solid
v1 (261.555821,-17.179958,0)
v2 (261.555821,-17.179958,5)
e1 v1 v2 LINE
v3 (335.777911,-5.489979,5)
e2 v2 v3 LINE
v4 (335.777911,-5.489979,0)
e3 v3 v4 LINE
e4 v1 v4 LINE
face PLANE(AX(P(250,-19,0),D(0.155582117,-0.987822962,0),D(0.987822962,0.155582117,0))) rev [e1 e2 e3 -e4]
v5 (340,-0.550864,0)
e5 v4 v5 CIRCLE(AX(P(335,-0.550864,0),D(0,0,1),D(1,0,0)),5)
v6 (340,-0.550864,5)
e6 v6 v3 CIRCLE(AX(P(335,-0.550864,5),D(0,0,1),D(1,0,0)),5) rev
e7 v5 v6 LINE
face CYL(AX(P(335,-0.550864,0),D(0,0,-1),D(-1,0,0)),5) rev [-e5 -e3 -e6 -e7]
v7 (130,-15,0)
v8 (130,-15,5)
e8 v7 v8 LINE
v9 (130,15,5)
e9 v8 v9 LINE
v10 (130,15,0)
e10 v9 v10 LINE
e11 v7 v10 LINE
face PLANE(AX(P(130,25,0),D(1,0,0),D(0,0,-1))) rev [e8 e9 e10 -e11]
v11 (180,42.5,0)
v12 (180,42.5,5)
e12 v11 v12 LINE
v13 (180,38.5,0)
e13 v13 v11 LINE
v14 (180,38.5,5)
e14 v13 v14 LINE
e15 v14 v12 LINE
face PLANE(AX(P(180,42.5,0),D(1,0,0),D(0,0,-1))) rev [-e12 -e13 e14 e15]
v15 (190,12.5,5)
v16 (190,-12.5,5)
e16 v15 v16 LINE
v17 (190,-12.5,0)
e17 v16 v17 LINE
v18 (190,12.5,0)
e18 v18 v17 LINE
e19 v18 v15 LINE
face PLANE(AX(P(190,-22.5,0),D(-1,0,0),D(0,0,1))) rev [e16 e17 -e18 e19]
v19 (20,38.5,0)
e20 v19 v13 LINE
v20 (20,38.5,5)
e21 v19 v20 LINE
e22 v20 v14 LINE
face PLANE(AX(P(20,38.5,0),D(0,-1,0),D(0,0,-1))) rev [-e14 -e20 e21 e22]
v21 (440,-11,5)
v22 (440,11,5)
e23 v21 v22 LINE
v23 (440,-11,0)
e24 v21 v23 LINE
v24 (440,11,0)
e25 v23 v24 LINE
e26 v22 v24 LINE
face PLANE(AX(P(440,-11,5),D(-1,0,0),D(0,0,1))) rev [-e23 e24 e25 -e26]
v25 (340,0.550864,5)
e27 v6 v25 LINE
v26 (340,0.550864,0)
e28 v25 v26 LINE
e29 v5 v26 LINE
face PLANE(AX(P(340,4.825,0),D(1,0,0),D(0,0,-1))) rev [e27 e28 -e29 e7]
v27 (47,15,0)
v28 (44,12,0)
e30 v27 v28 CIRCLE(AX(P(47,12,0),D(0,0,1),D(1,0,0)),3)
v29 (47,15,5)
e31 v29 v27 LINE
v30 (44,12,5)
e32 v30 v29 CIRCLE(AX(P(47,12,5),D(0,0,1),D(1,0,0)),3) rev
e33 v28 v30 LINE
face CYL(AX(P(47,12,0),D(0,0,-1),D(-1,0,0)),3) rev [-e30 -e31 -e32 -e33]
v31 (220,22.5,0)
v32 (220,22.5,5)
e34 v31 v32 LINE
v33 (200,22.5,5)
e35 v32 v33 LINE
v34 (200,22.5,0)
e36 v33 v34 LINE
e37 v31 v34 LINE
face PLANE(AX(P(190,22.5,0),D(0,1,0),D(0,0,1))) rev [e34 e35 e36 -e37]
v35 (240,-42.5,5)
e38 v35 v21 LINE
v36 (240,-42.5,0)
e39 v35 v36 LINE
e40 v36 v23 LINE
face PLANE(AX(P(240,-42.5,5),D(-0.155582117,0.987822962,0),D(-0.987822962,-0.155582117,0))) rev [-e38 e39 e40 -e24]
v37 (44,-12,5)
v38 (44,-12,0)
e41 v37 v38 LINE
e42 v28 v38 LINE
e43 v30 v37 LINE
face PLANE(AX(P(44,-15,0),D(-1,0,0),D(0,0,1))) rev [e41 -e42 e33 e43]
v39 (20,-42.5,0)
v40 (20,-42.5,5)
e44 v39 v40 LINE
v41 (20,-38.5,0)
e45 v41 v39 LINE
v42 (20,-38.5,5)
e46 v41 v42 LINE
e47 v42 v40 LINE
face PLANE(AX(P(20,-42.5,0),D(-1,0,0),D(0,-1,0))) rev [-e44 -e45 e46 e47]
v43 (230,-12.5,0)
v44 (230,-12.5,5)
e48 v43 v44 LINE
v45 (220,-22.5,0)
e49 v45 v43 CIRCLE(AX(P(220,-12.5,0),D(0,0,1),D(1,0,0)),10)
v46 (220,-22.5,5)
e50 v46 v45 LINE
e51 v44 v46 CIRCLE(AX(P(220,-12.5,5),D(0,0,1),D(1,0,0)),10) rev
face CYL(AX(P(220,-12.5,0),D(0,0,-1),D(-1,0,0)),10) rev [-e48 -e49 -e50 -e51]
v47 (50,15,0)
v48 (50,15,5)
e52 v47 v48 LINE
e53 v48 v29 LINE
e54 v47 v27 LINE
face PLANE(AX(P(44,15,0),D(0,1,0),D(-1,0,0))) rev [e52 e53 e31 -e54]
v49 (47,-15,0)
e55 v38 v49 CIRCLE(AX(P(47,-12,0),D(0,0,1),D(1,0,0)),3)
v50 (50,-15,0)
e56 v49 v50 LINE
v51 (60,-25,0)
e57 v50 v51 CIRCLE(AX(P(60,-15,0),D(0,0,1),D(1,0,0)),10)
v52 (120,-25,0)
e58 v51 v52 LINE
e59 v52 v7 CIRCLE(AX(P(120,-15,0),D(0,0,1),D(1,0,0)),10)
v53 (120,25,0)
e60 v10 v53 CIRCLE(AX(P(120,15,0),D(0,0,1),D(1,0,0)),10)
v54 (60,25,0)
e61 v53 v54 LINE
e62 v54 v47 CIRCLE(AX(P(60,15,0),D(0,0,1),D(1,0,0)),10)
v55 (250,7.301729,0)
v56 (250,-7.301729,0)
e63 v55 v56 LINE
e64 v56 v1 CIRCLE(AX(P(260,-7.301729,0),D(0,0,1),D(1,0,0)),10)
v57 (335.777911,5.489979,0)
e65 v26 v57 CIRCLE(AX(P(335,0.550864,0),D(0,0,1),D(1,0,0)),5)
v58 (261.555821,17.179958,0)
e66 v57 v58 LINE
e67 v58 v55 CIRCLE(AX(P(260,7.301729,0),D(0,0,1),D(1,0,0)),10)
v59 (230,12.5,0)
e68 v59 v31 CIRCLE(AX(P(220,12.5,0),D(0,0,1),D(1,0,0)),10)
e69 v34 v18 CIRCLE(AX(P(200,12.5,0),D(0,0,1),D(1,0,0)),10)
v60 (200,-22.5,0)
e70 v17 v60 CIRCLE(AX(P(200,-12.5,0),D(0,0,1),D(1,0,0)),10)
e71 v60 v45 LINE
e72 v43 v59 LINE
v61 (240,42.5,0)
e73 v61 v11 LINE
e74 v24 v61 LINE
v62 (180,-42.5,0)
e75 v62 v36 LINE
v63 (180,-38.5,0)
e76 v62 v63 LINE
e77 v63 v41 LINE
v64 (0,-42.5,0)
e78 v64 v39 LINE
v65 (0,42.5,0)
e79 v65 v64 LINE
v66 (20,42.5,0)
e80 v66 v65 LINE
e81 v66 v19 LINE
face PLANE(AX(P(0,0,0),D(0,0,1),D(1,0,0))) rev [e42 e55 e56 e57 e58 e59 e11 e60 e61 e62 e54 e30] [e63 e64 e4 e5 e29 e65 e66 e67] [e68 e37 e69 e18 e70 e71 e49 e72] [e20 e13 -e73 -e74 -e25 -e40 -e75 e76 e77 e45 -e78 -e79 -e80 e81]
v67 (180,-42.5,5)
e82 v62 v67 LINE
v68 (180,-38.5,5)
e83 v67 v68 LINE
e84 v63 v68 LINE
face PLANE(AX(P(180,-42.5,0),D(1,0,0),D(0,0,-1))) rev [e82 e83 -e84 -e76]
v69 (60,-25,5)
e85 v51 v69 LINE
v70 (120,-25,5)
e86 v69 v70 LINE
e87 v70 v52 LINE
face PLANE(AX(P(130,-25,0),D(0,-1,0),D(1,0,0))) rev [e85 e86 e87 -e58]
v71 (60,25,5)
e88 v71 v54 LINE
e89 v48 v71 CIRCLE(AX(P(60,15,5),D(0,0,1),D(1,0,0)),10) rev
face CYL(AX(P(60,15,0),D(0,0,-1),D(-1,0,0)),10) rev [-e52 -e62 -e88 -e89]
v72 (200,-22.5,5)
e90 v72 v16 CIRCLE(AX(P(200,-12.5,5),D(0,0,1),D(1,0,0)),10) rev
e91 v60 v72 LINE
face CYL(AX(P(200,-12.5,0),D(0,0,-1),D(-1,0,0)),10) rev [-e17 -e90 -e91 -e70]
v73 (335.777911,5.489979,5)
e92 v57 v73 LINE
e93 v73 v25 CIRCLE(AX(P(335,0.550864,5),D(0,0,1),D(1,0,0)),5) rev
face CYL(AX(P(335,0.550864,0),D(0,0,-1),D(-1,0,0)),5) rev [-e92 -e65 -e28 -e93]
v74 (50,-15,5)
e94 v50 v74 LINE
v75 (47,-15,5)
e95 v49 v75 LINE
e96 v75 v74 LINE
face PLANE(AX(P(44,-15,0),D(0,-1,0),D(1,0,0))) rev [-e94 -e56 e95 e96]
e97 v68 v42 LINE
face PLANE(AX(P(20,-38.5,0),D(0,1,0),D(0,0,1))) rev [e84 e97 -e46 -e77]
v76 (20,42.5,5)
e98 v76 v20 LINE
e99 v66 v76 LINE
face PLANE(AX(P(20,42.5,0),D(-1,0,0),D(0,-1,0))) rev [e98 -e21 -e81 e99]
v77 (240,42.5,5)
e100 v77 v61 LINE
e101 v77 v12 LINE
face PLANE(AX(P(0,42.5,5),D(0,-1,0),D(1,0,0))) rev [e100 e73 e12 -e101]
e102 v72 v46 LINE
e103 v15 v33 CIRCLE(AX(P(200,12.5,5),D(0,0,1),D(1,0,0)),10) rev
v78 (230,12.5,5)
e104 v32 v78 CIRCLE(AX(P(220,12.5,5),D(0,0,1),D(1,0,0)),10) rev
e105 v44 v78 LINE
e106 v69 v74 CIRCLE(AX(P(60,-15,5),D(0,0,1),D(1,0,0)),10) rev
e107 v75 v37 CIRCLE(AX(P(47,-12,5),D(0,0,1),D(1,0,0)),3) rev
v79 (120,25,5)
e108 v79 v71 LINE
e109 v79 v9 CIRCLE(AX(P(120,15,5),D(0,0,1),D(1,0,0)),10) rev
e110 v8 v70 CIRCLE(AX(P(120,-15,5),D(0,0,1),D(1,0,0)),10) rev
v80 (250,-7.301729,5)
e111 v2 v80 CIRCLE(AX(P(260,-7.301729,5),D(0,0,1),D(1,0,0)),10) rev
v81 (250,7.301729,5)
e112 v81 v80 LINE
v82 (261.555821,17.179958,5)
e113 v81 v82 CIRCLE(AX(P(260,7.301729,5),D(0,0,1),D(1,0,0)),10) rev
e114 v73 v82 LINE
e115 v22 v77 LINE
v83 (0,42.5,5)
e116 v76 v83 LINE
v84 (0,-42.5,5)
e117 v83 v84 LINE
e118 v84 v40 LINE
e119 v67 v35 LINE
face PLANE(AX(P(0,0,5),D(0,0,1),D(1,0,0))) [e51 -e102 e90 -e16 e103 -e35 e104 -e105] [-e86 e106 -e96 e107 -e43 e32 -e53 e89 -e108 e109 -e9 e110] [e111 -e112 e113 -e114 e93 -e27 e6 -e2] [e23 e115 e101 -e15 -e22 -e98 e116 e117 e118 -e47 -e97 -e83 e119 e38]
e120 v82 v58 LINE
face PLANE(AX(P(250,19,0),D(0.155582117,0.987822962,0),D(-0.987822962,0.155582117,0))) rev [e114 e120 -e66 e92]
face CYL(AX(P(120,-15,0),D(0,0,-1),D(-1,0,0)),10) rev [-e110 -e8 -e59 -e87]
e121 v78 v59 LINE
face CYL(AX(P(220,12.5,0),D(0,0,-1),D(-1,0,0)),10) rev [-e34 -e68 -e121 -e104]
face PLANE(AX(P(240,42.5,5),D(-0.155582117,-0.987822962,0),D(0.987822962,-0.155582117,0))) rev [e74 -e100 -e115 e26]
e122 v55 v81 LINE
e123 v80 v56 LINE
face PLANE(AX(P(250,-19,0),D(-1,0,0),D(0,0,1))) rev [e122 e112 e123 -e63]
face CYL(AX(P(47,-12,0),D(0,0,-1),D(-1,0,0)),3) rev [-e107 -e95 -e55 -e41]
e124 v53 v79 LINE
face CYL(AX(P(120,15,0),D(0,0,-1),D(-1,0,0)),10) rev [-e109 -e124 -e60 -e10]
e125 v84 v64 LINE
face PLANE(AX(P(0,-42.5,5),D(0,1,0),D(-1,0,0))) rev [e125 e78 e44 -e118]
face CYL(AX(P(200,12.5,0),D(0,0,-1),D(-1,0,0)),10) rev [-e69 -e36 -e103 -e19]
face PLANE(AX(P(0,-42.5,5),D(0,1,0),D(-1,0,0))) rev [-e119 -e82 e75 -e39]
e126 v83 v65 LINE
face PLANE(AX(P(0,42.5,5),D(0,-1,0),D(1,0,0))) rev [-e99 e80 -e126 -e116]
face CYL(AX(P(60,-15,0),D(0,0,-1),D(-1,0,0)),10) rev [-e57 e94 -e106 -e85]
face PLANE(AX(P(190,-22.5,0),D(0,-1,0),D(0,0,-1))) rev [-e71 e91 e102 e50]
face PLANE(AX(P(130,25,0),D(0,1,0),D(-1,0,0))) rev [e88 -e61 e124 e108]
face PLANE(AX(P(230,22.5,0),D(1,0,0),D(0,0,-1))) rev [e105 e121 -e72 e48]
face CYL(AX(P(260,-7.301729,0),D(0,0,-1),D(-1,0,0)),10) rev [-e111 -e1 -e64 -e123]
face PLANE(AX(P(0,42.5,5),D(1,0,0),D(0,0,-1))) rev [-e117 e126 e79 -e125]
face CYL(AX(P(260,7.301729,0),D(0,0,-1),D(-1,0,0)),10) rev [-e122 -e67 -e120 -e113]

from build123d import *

# Parameters (mm, degrees)
GRUNDPLATTE_DEPTH                  = 5
SCHNITT_LINEAR_AUSTRAGEN1_DEPTH    = 443.076068115
VERRUNDUNG1_R                      = 10
SKIZZE3_W                          = 160
SKIZZE3_H                          = 4
AUSSCHNITT_FL_CHENAUFDOPPLER_DEPTH = 443.076068115
SKIZZE4_W                          = 40
SKIZZE4_H                          = 45
AUSSCHNITT_GEWICHT_DEPTH           = 443.076068115
VERRUNDUNG2_R                      = 10
VERRUNDUNG3_R                      = 5
VERRUNDUNG4_R                      = 3


with BuildPart() as part:
    # Skizze1 → Grundplatte (new body)
    with BuildSketch(Plane.XY):
        Polygon((0, 42.5), (0, -42.5), (240, -42.5), (440, -11), (440, 11), (240, 42.5), align=None)
    extrude(amount=GRUNDPLATTE_DEPTH)

    # Skizze2 → Schnitt-Linear austragen1 (cut, through all)
    with BuildSketch(Plane.XY.offset(5)):
        Polygon((130, 25), (50, 25), (50, 15), (44, 15), (44, -15), (50, -15), (50, -25), (130, -25), align=None)
    extrude(amount=-SCHNITT_LINEAR_AUSTRAGEN1_DEPTH, mode=Mode.SUBTRACT)

    # Verrundung1
    verrundung1_edges = [part.edges().sort_by_distance(p)[0] for p in [
        (130, 25, 2.5),
        (130, -25, 2.5),
        (50, 25, 2.5),
        (50, -25, 2.5),
    ]]
    fillet(verrundung1_edges, radius=VERRUNDUNG1_R - 0.0001)  # a hair under: the kernel refuses the full size

    # Skizze3 → Ausschnitt_Flächenaufdoppler (cut, through all)
    with BuildSketch(Plane.XY.offset(5)):
        with Locations((100, 40.5)):
            Rectangle(SKIZZE3_W, SKIZZE3_H)
        with Locations((100, -40.5)):
            Rectangle(SKIZZE3_W, SKIZZE3_H)
    extrude(amount=-AUSSCHNITT_FL_CHENAUFDOPPLER_DEPTH, mode=Mode.SUBTRACT)

    # Skizze4 → Ausschnitt Gewicht (cut, through all)
    with BuildSketch(Plane.XY.offset(5)):
        with Locations((210, 0)):
            Rectangle(SKIZZE4_W, SKIZZE4_H)
        Polygon((250, -19), (250, 19), (340, 4.825), (340, -4.825), align=None)
    extrude(amount=-AUSSCHNITT_GEWICHT_DEPTH, mode=Mode.SUBTRACT)

    # Verrundung2
    verrundung2_edges = [part.edges().sort_by_distance(p)[0] for p in [
        (190, 22.5, 2.5),
        (230, 22.5, 2.5),
        (230, -22.5, 2.5),
        (190, -22.5, 2.5),
        (250, -19, 2.5),
        (250, 19, 2.5),
    ]]
    fillet(verrundung2_edges, radius=VERRUNDUNG2_R)

    # Verrundung3
    verrundung3_edges = [part.edges().sort_by_distance(p)[0] for p in [
        (340, -4.825, 2.5),
        (340, 4.825, 2.5),
    ]]
    fillet(verrundung3_edges, radius=VERRUNDUNG3_R)

    # Verrundung4
    verrundung4_edges = [part.edges().sort_by_distance(p)[0] for p in [
        (44, -15, 2.5),
        (44, 15, 2.5),
    ]]
    fillet(verrundung4_edges, radius=VERRUNDUNG4_R)


solid = part.part
